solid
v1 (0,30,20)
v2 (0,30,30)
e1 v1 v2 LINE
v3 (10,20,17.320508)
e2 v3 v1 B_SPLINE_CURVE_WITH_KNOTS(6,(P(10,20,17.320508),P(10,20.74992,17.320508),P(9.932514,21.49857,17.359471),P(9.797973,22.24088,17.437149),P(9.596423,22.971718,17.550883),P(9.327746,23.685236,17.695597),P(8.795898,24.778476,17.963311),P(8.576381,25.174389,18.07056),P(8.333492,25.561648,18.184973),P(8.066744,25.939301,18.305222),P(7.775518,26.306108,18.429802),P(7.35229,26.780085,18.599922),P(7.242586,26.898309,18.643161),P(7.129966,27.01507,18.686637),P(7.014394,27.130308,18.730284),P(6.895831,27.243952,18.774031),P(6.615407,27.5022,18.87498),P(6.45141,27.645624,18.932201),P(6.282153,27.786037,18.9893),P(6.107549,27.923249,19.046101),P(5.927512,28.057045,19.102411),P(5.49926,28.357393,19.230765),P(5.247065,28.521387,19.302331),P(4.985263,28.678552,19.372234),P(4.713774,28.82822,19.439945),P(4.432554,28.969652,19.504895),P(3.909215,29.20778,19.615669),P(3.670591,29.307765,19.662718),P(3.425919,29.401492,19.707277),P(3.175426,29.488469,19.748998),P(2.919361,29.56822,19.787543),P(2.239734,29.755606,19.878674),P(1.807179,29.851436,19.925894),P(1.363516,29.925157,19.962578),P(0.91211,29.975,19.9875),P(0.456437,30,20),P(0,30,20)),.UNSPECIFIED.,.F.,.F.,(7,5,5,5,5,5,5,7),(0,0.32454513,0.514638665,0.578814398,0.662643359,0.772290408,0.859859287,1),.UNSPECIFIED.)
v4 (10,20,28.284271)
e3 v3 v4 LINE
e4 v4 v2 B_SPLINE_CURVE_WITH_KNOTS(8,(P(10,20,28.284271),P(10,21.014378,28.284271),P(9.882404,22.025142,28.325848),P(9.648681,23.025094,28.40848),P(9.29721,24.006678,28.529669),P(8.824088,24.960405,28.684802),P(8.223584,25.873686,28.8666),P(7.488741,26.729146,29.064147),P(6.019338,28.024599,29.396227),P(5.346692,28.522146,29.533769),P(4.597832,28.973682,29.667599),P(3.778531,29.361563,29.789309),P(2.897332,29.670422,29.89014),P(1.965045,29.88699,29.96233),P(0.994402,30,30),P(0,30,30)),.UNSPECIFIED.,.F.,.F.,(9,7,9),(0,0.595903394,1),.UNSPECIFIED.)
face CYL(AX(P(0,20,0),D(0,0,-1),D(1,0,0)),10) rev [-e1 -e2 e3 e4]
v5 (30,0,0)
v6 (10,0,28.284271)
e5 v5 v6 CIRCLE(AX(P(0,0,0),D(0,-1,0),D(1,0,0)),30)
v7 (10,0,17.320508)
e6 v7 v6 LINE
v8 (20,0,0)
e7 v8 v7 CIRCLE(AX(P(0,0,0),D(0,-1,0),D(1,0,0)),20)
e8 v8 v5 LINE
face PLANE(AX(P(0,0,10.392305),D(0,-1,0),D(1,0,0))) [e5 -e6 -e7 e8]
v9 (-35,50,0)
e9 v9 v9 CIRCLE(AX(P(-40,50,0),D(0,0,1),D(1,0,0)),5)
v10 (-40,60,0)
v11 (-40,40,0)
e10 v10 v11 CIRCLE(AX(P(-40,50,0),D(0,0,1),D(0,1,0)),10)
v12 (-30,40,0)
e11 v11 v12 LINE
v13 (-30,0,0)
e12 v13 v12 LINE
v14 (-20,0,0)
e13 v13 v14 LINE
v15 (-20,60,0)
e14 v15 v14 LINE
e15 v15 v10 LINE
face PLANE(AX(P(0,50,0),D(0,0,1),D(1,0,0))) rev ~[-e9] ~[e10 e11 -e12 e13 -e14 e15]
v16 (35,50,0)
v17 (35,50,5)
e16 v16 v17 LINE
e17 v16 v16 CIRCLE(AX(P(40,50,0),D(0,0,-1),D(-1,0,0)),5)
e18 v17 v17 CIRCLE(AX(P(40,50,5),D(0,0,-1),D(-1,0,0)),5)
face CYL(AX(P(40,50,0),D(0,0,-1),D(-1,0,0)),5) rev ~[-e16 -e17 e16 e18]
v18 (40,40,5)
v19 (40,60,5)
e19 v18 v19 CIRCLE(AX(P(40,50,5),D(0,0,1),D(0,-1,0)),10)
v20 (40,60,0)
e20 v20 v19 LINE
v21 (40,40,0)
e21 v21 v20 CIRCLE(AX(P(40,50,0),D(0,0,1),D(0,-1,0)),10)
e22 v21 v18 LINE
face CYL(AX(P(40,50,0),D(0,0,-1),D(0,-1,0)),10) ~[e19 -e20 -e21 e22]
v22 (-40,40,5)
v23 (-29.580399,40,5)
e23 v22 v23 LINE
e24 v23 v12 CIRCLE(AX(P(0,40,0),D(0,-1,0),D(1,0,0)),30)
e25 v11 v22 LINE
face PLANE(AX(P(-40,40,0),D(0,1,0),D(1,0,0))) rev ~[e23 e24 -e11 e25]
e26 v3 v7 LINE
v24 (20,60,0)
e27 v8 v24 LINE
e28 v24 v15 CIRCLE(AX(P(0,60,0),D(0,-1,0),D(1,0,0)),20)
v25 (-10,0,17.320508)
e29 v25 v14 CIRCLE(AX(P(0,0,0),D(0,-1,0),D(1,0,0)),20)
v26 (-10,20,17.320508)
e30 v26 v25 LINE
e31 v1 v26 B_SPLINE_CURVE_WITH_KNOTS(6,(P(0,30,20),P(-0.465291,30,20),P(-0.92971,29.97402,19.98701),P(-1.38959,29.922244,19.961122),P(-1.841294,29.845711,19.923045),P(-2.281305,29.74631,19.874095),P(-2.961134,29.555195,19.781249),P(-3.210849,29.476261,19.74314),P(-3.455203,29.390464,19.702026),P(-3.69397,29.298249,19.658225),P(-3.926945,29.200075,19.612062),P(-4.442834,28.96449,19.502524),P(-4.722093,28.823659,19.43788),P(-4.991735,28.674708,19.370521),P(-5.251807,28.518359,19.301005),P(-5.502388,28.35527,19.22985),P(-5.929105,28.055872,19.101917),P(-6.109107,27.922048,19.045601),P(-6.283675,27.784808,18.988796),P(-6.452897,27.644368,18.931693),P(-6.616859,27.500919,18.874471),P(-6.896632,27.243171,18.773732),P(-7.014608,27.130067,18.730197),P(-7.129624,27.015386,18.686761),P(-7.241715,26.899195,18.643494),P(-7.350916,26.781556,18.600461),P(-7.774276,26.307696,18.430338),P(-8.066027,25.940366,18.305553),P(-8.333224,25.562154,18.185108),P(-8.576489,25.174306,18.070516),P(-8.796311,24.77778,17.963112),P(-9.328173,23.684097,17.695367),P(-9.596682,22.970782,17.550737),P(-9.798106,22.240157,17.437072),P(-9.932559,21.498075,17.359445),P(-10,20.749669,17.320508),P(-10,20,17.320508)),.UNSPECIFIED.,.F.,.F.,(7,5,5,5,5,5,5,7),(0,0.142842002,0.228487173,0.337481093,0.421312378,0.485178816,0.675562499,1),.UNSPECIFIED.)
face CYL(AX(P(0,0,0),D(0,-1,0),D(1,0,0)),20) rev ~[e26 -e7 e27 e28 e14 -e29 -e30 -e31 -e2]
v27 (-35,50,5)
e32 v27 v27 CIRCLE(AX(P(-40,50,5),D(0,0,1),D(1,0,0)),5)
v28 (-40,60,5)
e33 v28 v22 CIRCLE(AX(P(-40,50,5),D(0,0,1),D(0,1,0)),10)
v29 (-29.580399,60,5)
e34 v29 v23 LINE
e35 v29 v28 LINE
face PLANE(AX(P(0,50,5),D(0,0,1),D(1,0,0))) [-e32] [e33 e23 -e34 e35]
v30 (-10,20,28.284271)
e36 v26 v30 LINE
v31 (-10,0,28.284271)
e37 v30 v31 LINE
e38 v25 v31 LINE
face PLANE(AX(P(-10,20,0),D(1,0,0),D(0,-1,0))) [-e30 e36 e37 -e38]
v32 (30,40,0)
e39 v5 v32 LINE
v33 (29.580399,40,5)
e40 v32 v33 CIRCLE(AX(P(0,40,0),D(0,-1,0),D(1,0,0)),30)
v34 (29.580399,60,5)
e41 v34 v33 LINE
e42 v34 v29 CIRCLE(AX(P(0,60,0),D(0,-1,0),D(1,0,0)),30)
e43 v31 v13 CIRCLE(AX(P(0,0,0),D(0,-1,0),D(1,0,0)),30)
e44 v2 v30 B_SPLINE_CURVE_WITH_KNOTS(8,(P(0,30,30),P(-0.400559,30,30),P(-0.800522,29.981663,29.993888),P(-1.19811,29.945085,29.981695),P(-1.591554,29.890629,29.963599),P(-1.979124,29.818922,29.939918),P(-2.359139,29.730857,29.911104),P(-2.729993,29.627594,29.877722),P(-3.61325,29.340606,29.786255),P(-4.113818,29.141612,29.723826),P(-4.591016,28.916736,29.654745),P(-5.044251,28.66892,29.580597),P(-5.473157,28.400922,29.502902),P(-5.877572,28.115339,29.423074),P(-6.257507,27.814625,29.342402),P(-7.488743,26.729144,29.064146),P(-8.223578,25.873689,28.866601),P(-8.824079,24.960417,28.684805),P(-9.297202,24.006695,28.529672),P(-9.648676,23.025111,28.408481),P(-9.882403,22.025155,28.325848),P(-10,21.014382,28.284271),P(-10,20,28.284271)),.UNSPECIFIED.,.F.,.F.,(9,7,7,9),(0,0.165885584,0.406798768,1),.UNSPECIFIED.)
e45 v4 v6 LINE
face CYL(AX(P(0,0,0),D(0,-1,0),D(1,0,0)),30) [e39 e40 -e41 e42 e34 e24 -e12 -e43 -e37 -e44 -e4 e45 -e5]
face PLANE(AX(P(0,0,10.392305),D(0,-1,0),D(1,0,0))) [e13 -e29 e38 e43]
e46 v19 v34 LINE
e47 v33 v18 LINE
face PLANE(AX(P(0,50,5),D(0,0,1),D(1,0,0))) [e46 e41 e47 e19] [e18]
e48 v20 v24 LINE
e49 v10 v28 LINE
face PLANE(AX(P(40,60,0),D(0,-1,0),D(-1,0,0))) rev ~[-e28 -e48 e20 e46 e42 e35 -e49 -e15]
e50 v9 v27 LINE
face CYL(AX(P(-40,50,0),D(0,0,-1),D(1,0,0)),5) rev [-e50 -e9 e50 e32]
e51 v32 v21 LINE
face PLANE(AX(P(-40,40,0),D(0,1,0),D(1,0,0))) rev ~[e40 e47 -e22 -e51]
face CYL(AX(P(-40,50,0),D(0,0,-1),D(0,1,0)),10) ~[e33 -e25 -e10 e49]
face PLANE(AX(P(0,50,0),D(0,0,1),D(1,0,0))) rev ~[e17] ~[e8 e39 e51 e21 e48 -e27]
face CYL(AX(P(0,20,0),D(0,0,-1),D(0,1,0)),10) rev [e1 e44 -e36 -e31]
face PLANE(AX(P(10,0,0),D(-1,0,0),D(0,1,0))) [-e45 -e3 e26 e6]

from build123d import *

# Parameters (mm, degrees)
F2_DEPTH  = 60
F4_DEPTH  = 5
F5_R      = 5
F6_DEPTH  = 5
F8_DEPTH  = 30.0010001
F9_R      = 20
F10_DEPTH = 60.0010001


# Not quite as in the source:
# - a pattern or mirror of a feature is missing from the dataset's text; its kind, count and spacing are read off the source's solid


with BuildPart() as f2:
    # F1 (on Front) → F2 (new body)
    with BuildSketch(Plane.XZ):
        with BuildLine():
            Line((-30, 0), (30, 0))
            ThreePointArc((30, 0), (0, 30), (-30, 0))
        make_face()
    extrude(amount=-F2_DEPTH)

    # F3 (on Top) → F4 (join)
    with BuildSketch(Plane.XY):
        with BuildLine():
            ThreePointArc((-40, 60), (-50, 50), (-40, 40))
            Line((-40, 40), (40, 40))
            ThreePointArc((40, 40), (50, 50), (40, 60))
            Line((40, 60), (-40, 60))
        make_face()
    extrude(amount=F4_DEPTH)

    # F5 (on Top) → F6 (cut, through all)
    with BuildSketch(Plane.XY):
        with Locations((-40, 50)):
            Circle(F5_R)
    f6 = extrude(amount=F6_DEPTH, mode=Mode.SUBTRACT)

    # F6_copies: F6 across plane
    add(f6.mirror(Plane(origin=(0, 0, 0), x_dir=(0, 0, 1), z_dir=(1, 0, 0))), mode=Mode.SUBTRACT)

    # F7 (on Top) → F8 (cut, through all)
    with BuildSketch(Plane.XY):
        with BuildLine():
            Line((-10, 20), (-10, 0))
            Line((-10, 0), (0, 0))
            Line((0, 0), (0, 30))
            ThreePointArc((0, 30), (-7.0710678119, 27.0710678119), (-10, 20))
        make_face()
        with BuildLine():
            Line((0, 30), (0, 0))
            Line((0, 0), (10, 0))
            Line((10, 0), (10, 20))
            ThreePointArc((10, 20), (7.0710678119, 27.0710678119), (0, 30))
        make_face()
    extrude(amount=F8_DEPTH, mode=Mode.SUBTRACT)

    # F9 (on face) → F10 (cut, through all)
    with BuildSketch(Plane.XZ):
        Circle(F9_R)
    extrude(amount=-F10_DEPTH, mode=Mode.SUBTRACT)


solid = f2.part
